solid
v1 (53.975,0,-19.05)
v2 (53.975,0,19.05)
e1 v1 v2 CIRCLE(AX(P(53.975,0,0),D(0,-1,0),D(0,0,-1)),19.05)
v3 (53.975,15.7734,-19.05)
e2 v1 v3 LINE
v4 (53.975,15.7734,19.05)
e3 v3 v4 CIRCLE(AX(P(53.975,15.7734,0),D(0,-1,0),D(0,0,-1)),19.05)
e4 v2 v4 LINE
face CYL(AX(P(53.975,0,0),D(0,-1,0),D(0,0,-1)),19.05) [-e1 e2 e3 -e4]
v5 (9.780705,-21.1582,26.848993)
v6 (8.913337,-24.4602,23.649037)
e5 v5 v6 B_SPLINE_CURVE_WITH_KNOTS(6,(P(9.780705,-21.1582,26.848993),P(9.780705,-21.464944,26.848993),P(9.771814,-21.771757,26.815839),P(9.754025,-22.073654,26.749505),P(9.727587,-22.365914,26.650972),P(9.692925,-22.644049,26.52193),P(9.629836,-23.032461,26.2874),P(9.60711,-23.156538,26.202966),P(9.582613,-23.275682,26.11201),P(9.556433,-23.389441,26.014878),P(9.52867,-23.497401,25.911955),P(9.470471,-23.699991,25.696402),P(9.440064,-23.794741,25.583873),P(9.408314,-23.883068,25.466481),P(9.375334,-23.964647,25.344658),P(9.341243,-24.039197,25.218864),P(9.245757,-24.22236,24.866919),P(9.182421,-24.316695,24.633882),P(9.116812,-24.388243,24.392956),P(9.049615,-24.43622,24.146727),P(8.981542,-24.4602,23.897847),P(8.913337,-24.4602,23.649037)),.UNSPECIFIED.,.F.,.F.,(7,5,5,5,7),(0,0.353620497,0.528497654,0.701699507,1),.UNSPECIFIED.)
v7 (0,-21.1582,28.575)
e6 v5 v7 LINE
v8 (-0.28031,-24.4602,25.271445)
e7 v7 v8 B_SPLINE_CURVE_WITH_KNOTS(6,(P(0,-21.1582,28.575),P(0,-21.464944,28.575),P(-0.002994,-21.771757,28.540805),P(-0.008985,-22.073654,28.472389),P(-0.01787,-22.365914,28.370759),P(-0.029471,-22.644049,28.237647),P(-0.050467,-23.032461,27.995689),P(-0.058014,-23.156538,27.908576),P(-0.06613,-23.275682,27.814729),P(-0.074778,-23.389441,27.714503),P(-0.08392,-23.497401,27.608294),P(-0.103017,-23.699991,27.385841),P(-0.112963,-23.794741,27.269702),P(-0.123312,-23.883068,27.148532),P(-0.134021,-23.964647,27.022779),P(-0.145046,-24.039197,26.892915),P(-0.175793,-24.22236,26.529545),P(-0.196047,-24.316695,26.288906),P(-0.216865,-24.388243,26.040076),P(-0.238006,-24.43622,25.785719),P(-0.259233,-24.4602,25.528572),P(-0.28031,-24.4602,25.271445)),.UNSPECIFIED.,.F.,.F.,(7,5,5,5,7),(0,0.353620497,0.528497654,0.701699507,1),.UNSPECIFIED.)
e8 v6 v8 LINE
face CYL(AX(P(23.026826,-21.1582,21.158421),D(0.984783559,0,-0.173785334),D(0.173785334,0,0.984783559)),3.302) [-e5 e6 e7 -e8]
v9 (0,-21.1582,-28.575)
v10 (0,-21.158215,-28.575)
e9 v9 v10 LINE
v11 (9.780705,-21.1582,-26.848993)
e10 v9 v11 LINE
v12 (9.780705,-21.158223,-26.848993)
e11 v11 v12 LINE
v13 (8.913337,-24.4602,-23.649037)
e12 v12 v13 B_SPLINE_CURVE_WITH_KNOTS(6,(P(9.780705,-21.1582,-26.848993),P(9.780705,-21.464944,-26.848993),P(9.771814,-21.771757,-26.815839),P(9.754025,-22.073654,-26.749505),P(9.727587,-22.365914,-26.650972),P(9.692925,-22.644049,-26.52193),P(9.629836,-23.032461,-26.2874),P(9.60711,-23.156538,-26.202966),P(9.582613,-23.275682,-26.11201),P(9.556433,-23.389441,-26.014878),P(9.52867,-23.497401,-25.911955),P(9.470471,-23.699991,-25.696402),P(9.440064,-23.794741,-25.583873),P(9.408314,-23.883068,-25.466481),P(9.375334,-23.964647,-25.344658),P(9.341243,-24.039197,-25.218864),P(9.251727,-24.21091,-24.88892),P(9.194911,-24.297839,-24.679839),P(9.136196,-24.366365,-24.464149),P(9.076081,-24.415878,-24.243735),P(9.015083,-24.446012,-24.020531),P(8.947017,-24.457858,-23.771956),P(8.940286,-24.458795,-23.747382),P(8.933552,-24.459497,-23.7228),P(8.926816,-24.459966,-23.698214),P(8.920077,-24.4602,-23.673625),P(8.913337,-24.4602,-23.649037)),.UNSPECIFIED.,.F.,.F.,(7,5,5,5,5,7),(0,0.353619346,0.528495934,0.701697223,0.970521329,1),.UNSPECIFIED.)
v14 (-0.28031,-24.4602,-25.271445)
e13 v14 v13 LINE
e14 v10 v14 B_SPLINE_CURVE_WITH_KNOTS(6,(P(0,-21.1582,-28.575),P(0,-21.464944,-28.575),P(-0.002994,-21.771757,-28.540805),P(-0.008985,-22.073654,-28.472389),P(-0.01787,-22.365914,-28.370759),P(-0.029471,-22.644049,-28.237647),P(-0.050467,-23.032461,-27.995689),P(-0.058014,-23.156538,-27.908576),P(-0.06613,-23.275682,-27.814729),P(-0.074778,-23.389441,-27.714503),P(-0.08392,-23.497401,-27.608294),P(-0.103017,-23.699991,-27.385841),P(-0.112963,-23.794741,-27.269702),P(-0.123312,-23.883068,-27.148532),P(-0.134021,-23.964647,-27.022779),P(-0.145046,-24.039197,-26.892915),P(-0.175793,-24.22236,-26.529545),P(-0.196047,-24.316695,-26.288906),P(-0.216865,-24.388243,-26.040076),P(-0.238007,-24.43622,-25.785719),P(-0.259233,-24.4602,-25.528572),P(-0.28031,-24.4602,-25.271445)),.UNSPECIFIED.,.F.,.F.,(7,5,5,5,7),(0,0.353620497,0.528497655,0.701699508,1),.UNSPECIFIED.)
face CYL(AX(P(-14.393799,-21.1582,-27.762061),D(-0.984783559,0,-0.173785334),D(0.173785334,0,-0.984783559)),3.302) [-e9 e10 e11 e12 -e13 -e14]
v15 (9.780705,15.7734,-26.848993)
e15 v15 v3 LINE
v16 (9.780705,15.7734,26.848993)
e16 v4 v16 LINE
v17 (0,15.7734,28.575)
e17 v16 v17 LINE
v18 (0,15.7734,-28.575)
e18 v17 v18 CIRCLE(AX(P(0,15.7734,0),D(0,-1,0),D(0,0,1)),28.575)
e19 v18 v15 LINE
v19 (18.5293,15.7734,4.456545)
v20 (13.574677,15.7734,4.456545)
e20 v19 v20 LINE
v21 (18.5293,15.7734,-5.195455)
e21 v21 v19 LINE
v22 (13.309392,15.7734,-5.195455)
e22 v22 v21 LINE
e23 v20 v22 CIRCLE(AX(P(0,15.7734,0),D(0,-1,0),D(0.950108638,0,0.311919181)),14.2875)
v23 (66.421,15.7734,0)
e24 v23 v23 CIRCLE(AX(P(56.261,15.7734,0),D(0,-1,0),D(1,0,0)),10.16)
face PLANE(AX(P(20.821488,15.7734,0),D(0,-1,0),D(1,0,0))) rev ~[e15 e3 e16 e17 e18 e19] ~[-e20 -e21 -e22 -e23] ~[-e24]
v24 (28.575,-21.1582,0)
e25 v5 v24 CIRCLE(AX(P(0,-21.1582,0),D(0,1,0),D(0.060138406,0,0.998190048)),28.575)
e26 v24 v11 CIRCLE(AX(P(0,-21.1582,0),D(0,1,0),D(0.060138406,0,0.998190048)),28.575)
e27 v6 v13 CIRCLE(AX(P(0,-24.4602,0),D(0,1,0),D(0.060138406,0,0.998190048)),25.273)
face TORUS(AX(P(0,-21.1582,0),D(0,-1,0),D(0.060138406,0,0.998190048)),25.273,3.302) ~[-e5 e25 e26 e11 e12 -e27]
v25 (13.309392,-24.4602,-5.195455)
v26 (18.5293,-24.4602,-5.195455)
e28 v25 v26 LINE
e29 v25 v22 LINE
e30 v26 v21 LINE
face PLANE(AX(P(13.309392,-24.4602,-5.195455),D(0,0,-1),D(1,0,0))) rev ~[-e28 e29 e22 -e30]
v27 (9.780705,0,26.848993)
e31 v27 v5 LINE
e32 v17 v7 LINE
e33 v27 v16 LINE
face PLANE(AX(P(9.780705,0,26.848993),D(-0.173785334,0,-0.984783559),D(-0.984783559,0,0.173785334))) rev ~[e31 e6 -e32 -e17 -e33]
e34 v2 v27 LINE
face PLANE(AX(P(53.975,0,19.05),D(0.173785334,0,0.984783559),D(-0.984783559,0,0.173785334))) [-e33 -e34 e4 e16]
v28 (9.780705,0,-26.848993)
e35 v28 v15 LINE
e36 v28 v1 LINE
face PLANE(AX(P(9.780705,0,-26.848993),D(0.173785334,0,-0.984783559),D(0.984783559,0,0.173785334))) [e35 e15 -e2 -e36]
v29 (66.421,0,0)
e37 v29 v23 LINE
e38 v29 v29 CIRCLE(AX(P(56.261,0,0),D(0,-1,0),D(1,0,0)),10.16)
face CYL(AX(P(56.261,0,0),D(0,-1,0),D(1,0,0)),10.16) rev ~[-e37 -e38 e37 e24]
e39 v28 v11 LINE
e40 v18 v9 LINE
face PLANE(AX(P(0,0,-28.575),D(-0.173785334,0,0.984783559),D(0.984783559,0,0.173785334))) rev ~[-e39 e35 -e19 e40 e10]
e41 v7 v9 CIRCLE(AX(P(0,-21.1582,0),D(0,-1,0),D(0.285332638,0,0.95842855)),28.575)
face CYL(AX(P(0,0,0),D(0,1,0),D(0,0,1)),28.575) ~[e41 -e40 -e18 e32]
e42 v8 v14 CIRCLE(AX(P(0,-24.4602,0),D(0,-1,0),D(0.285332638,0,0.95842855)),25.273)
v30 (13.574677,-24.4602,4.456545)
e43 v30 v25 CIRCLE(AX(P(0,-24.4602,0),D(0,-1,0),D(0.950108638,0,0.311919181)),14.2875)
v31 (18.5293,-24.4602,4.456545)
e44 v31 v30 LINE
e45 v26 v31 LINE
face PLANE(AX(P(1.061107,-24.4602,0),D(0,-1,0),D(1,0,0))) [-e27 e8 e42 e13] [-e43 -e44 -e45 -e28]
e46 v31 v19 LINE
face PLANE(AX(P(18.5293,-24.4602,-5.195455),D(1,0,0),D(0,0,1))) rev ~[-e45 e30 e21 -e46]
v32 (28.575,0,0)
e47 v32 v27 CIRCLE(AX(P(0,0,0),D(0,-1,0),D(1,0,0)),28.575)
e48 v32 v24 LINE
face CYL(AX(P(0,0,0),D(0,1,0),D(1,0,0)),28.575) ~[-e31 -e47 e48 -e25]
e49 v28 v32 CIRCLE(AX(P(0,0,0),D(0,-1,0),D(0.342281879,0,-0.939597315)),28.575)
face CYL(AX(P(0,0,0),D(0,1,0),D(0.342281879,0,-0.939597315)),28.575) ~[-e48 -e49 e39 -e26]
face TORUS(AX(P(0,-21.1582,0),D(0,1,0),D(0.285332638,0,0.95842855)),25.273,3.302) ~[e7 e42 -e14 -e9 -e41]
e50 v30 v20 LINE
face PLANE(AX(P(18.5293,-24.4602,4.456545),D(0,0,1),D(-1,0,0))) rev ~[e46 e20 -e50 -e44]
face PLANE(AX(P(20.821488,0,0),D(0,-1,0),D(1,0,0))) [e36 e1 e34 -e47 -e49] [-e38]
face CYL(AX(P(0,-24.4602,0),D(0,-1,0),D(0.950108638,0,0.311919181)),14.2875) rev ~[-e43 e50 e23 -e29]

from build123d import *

# Parameters (mm, degrees)
F1_DEPTH    = 15.7734
F3_DEPTH    = 24.4602
F4_T1_DEPTH = 37.9988318329
F4_T3_DEPTH = 37.9988318329
F4_T6_ANGLE = 213.1574660215
F4_T8_ANGLE = 173.1044855741
F6_DEPTH    = 40.2346
F7_R        = 10.16
F8_DEPTH    = 15.7744


# Not quite as in the source:
# - a fillet or chamfer that OpenCascade refuses, or shapes differently, is made with other operations: its cross-section is extruded or revolved along the edge and cut away or added


with BuildPart() as f1:
    # F0 (on Front) → F1 (new body)
    with BuildSketch(Plane.XZ):
        with BuildLine():
            Line((53.975, 19.05), (9.780704698, 26.8489932886))
            Line((9.780704698, 26.8489932886), (0, 28.575))
            ThreePointArc((0, 28.575), (-28.575, 0), (0, -28.575))
            Line((0, -28.575), (9.780704698, -26.8489932886))
            Line((9.780704698, -26.8489932886), (53.975, -19.05))
            ThreePointArc((53.975, -19.05), (73.025, 0), (53.975, 19.05))
        make_face()
    extrude(amount=-F1_DEPTH)

    # F2 (on face) → F3 (join)
    with BuildSketch(Plane.XZ):
        with BuildLine():
            Line((9.780704698, 26.8489932886), (0, 28.575))
            ThreePointArc((0, 28.575), (-28.575, 0), (0, -28.575))
            Line((0, -28.575), (9.780704698, -26.8489932886))
            ThreePointArc((9.780704698, -26.8489932886), (23.4095521288, -16.3866864902), (28.575, 0))
            ThreePointArc((28.575, 0), (23.4095521288, 16.3866864902), (9.780704698, 26.8489932886))
        make_face()
    extrude(amount=F3_DEPTH)

    # F4: fillet of radius 3.302 on 4 edges, made by hand

    # F4_s2 → F4_t1 (cut)
    with BuildSketch(Plane(origin=(-18.7103124217, 0, -3.3018198391), x_dir=(0, 1, 0), z_dir=(0.9847835588, 0, 0.1737853339))):
        with BuildLine():
            ThreePointArc((-21.1582, -28.1401901932), (-23.4930665915, -27.1730567847), (-24.4602, -24.8381901932))
            Line((-24.4602, -24.8381901932), (-24.4602, -28.1401901932))
            Line((-24.4602, -28.1401901932), (-21.1582, -28.1401901932))
        make_face()
    extrude(amount=F4_T1_DEPTH, mode=Mode.SUBTRACT)

    # F4_s4 → F4_t3 (cut)
    with BuildSketch(Plane(origin=(18.7103124217, 0, -3.3018198391), x_dir=(0, 1, 0), z_dir=(-0.9847835588, 0, 0.1737853339))):
        with BuildLine():
            ThreePointArc((-21.1582, -28.1401901932), (-23.4930665915, -27.1730567847), (-24.4602, -24.8381901932))
            Line((-24.4602, -24.8381901932), (-24.4602, -28.1401901932))
            Line((-24.4602, -28.1401901932), (-21.1582, -28.1401901932))
        make_face()
    extrude(amount=F4_T3_DEPTH, mode=Mode.SUBTRACT)

    # F4_s5 → F4_t6 (revolve, cut)
    with BuildSketch(Plane(origin=(0, 0, 0), x_dir=(0, 1, 0), z_dir=(0.95842855, 0, -0.2853326385))):
        with BuildLine():
            ThreePointArc((-24.4602, 25.273), (-23.4930665915, 27.6078665915), (-21.1582, 28.575))
            Line((-21.1582, 28.575), (-24.4602, 28.575))
            Line((-24.4602, 28.575), (-24.4602, 25.273))
        make_face()
    revolve(axis=Axis((0, -24.4602, 0), (0, -1, 0)), revolution_arc=F4_T6_ANGLE, mode=Mode.SUBTRACT)

    # F4_s7 → F4_t8 (revolve, cut)
    with BuildSketch(Plane(origin=(0, 0, 0), x_dir=(0, 1, 0), z_dir=(-0.9981900481, 0, 0.0601384063))):
        with BuildLine():
            ThreePointArc((-21.1582, -28.575), (-23.4930665915, -27.6078665915), (-24.4602, -25.273))
            Line((-24.4602, -25.273), (-24.4602, -28.575))
            Line((-24.4602, -28.575), (-21.1582, -28.575))
        make_face()
    revolve(axis=Axis((0, -24.4602, 0), (0, 1, 0)), revolution_arc=F4_T8_ANGLE, mode=Mode.SUBTRACT)

    # F5 (on face) → F6 (cut, through all)
    with BuildSketch(Plane.XZ.offset(24.4602)):
        with BuildLine():
            Line((18.5293, 4.4565453057), (13.574677167, 4.4565453057))
            ThreePointArc((13.574677167, 4.4565453057), (-14.2821064756, 0.3925440984), (13.3093916754, -5.1954546943))
            Line((13.3093916754, -5.1954546943), (18.5293, -5.1954546943))
            Line((18.5293, -5.1954546943), (18.5293, 4.4565453057))
        make_face()
    extrude(amount=-F6_DEPTH, mode=Mode.SUBTRACT)

    # F7 (on face) → F8 (cut, through all)
    with BuildSketch(Plane.XZ):
        with Locations((56.261, 0)):
            Circle(F7_R)
    extrude(amount=-F8_DEPTH, mode=Mode.SUBTRACT)


solid = f1.part
